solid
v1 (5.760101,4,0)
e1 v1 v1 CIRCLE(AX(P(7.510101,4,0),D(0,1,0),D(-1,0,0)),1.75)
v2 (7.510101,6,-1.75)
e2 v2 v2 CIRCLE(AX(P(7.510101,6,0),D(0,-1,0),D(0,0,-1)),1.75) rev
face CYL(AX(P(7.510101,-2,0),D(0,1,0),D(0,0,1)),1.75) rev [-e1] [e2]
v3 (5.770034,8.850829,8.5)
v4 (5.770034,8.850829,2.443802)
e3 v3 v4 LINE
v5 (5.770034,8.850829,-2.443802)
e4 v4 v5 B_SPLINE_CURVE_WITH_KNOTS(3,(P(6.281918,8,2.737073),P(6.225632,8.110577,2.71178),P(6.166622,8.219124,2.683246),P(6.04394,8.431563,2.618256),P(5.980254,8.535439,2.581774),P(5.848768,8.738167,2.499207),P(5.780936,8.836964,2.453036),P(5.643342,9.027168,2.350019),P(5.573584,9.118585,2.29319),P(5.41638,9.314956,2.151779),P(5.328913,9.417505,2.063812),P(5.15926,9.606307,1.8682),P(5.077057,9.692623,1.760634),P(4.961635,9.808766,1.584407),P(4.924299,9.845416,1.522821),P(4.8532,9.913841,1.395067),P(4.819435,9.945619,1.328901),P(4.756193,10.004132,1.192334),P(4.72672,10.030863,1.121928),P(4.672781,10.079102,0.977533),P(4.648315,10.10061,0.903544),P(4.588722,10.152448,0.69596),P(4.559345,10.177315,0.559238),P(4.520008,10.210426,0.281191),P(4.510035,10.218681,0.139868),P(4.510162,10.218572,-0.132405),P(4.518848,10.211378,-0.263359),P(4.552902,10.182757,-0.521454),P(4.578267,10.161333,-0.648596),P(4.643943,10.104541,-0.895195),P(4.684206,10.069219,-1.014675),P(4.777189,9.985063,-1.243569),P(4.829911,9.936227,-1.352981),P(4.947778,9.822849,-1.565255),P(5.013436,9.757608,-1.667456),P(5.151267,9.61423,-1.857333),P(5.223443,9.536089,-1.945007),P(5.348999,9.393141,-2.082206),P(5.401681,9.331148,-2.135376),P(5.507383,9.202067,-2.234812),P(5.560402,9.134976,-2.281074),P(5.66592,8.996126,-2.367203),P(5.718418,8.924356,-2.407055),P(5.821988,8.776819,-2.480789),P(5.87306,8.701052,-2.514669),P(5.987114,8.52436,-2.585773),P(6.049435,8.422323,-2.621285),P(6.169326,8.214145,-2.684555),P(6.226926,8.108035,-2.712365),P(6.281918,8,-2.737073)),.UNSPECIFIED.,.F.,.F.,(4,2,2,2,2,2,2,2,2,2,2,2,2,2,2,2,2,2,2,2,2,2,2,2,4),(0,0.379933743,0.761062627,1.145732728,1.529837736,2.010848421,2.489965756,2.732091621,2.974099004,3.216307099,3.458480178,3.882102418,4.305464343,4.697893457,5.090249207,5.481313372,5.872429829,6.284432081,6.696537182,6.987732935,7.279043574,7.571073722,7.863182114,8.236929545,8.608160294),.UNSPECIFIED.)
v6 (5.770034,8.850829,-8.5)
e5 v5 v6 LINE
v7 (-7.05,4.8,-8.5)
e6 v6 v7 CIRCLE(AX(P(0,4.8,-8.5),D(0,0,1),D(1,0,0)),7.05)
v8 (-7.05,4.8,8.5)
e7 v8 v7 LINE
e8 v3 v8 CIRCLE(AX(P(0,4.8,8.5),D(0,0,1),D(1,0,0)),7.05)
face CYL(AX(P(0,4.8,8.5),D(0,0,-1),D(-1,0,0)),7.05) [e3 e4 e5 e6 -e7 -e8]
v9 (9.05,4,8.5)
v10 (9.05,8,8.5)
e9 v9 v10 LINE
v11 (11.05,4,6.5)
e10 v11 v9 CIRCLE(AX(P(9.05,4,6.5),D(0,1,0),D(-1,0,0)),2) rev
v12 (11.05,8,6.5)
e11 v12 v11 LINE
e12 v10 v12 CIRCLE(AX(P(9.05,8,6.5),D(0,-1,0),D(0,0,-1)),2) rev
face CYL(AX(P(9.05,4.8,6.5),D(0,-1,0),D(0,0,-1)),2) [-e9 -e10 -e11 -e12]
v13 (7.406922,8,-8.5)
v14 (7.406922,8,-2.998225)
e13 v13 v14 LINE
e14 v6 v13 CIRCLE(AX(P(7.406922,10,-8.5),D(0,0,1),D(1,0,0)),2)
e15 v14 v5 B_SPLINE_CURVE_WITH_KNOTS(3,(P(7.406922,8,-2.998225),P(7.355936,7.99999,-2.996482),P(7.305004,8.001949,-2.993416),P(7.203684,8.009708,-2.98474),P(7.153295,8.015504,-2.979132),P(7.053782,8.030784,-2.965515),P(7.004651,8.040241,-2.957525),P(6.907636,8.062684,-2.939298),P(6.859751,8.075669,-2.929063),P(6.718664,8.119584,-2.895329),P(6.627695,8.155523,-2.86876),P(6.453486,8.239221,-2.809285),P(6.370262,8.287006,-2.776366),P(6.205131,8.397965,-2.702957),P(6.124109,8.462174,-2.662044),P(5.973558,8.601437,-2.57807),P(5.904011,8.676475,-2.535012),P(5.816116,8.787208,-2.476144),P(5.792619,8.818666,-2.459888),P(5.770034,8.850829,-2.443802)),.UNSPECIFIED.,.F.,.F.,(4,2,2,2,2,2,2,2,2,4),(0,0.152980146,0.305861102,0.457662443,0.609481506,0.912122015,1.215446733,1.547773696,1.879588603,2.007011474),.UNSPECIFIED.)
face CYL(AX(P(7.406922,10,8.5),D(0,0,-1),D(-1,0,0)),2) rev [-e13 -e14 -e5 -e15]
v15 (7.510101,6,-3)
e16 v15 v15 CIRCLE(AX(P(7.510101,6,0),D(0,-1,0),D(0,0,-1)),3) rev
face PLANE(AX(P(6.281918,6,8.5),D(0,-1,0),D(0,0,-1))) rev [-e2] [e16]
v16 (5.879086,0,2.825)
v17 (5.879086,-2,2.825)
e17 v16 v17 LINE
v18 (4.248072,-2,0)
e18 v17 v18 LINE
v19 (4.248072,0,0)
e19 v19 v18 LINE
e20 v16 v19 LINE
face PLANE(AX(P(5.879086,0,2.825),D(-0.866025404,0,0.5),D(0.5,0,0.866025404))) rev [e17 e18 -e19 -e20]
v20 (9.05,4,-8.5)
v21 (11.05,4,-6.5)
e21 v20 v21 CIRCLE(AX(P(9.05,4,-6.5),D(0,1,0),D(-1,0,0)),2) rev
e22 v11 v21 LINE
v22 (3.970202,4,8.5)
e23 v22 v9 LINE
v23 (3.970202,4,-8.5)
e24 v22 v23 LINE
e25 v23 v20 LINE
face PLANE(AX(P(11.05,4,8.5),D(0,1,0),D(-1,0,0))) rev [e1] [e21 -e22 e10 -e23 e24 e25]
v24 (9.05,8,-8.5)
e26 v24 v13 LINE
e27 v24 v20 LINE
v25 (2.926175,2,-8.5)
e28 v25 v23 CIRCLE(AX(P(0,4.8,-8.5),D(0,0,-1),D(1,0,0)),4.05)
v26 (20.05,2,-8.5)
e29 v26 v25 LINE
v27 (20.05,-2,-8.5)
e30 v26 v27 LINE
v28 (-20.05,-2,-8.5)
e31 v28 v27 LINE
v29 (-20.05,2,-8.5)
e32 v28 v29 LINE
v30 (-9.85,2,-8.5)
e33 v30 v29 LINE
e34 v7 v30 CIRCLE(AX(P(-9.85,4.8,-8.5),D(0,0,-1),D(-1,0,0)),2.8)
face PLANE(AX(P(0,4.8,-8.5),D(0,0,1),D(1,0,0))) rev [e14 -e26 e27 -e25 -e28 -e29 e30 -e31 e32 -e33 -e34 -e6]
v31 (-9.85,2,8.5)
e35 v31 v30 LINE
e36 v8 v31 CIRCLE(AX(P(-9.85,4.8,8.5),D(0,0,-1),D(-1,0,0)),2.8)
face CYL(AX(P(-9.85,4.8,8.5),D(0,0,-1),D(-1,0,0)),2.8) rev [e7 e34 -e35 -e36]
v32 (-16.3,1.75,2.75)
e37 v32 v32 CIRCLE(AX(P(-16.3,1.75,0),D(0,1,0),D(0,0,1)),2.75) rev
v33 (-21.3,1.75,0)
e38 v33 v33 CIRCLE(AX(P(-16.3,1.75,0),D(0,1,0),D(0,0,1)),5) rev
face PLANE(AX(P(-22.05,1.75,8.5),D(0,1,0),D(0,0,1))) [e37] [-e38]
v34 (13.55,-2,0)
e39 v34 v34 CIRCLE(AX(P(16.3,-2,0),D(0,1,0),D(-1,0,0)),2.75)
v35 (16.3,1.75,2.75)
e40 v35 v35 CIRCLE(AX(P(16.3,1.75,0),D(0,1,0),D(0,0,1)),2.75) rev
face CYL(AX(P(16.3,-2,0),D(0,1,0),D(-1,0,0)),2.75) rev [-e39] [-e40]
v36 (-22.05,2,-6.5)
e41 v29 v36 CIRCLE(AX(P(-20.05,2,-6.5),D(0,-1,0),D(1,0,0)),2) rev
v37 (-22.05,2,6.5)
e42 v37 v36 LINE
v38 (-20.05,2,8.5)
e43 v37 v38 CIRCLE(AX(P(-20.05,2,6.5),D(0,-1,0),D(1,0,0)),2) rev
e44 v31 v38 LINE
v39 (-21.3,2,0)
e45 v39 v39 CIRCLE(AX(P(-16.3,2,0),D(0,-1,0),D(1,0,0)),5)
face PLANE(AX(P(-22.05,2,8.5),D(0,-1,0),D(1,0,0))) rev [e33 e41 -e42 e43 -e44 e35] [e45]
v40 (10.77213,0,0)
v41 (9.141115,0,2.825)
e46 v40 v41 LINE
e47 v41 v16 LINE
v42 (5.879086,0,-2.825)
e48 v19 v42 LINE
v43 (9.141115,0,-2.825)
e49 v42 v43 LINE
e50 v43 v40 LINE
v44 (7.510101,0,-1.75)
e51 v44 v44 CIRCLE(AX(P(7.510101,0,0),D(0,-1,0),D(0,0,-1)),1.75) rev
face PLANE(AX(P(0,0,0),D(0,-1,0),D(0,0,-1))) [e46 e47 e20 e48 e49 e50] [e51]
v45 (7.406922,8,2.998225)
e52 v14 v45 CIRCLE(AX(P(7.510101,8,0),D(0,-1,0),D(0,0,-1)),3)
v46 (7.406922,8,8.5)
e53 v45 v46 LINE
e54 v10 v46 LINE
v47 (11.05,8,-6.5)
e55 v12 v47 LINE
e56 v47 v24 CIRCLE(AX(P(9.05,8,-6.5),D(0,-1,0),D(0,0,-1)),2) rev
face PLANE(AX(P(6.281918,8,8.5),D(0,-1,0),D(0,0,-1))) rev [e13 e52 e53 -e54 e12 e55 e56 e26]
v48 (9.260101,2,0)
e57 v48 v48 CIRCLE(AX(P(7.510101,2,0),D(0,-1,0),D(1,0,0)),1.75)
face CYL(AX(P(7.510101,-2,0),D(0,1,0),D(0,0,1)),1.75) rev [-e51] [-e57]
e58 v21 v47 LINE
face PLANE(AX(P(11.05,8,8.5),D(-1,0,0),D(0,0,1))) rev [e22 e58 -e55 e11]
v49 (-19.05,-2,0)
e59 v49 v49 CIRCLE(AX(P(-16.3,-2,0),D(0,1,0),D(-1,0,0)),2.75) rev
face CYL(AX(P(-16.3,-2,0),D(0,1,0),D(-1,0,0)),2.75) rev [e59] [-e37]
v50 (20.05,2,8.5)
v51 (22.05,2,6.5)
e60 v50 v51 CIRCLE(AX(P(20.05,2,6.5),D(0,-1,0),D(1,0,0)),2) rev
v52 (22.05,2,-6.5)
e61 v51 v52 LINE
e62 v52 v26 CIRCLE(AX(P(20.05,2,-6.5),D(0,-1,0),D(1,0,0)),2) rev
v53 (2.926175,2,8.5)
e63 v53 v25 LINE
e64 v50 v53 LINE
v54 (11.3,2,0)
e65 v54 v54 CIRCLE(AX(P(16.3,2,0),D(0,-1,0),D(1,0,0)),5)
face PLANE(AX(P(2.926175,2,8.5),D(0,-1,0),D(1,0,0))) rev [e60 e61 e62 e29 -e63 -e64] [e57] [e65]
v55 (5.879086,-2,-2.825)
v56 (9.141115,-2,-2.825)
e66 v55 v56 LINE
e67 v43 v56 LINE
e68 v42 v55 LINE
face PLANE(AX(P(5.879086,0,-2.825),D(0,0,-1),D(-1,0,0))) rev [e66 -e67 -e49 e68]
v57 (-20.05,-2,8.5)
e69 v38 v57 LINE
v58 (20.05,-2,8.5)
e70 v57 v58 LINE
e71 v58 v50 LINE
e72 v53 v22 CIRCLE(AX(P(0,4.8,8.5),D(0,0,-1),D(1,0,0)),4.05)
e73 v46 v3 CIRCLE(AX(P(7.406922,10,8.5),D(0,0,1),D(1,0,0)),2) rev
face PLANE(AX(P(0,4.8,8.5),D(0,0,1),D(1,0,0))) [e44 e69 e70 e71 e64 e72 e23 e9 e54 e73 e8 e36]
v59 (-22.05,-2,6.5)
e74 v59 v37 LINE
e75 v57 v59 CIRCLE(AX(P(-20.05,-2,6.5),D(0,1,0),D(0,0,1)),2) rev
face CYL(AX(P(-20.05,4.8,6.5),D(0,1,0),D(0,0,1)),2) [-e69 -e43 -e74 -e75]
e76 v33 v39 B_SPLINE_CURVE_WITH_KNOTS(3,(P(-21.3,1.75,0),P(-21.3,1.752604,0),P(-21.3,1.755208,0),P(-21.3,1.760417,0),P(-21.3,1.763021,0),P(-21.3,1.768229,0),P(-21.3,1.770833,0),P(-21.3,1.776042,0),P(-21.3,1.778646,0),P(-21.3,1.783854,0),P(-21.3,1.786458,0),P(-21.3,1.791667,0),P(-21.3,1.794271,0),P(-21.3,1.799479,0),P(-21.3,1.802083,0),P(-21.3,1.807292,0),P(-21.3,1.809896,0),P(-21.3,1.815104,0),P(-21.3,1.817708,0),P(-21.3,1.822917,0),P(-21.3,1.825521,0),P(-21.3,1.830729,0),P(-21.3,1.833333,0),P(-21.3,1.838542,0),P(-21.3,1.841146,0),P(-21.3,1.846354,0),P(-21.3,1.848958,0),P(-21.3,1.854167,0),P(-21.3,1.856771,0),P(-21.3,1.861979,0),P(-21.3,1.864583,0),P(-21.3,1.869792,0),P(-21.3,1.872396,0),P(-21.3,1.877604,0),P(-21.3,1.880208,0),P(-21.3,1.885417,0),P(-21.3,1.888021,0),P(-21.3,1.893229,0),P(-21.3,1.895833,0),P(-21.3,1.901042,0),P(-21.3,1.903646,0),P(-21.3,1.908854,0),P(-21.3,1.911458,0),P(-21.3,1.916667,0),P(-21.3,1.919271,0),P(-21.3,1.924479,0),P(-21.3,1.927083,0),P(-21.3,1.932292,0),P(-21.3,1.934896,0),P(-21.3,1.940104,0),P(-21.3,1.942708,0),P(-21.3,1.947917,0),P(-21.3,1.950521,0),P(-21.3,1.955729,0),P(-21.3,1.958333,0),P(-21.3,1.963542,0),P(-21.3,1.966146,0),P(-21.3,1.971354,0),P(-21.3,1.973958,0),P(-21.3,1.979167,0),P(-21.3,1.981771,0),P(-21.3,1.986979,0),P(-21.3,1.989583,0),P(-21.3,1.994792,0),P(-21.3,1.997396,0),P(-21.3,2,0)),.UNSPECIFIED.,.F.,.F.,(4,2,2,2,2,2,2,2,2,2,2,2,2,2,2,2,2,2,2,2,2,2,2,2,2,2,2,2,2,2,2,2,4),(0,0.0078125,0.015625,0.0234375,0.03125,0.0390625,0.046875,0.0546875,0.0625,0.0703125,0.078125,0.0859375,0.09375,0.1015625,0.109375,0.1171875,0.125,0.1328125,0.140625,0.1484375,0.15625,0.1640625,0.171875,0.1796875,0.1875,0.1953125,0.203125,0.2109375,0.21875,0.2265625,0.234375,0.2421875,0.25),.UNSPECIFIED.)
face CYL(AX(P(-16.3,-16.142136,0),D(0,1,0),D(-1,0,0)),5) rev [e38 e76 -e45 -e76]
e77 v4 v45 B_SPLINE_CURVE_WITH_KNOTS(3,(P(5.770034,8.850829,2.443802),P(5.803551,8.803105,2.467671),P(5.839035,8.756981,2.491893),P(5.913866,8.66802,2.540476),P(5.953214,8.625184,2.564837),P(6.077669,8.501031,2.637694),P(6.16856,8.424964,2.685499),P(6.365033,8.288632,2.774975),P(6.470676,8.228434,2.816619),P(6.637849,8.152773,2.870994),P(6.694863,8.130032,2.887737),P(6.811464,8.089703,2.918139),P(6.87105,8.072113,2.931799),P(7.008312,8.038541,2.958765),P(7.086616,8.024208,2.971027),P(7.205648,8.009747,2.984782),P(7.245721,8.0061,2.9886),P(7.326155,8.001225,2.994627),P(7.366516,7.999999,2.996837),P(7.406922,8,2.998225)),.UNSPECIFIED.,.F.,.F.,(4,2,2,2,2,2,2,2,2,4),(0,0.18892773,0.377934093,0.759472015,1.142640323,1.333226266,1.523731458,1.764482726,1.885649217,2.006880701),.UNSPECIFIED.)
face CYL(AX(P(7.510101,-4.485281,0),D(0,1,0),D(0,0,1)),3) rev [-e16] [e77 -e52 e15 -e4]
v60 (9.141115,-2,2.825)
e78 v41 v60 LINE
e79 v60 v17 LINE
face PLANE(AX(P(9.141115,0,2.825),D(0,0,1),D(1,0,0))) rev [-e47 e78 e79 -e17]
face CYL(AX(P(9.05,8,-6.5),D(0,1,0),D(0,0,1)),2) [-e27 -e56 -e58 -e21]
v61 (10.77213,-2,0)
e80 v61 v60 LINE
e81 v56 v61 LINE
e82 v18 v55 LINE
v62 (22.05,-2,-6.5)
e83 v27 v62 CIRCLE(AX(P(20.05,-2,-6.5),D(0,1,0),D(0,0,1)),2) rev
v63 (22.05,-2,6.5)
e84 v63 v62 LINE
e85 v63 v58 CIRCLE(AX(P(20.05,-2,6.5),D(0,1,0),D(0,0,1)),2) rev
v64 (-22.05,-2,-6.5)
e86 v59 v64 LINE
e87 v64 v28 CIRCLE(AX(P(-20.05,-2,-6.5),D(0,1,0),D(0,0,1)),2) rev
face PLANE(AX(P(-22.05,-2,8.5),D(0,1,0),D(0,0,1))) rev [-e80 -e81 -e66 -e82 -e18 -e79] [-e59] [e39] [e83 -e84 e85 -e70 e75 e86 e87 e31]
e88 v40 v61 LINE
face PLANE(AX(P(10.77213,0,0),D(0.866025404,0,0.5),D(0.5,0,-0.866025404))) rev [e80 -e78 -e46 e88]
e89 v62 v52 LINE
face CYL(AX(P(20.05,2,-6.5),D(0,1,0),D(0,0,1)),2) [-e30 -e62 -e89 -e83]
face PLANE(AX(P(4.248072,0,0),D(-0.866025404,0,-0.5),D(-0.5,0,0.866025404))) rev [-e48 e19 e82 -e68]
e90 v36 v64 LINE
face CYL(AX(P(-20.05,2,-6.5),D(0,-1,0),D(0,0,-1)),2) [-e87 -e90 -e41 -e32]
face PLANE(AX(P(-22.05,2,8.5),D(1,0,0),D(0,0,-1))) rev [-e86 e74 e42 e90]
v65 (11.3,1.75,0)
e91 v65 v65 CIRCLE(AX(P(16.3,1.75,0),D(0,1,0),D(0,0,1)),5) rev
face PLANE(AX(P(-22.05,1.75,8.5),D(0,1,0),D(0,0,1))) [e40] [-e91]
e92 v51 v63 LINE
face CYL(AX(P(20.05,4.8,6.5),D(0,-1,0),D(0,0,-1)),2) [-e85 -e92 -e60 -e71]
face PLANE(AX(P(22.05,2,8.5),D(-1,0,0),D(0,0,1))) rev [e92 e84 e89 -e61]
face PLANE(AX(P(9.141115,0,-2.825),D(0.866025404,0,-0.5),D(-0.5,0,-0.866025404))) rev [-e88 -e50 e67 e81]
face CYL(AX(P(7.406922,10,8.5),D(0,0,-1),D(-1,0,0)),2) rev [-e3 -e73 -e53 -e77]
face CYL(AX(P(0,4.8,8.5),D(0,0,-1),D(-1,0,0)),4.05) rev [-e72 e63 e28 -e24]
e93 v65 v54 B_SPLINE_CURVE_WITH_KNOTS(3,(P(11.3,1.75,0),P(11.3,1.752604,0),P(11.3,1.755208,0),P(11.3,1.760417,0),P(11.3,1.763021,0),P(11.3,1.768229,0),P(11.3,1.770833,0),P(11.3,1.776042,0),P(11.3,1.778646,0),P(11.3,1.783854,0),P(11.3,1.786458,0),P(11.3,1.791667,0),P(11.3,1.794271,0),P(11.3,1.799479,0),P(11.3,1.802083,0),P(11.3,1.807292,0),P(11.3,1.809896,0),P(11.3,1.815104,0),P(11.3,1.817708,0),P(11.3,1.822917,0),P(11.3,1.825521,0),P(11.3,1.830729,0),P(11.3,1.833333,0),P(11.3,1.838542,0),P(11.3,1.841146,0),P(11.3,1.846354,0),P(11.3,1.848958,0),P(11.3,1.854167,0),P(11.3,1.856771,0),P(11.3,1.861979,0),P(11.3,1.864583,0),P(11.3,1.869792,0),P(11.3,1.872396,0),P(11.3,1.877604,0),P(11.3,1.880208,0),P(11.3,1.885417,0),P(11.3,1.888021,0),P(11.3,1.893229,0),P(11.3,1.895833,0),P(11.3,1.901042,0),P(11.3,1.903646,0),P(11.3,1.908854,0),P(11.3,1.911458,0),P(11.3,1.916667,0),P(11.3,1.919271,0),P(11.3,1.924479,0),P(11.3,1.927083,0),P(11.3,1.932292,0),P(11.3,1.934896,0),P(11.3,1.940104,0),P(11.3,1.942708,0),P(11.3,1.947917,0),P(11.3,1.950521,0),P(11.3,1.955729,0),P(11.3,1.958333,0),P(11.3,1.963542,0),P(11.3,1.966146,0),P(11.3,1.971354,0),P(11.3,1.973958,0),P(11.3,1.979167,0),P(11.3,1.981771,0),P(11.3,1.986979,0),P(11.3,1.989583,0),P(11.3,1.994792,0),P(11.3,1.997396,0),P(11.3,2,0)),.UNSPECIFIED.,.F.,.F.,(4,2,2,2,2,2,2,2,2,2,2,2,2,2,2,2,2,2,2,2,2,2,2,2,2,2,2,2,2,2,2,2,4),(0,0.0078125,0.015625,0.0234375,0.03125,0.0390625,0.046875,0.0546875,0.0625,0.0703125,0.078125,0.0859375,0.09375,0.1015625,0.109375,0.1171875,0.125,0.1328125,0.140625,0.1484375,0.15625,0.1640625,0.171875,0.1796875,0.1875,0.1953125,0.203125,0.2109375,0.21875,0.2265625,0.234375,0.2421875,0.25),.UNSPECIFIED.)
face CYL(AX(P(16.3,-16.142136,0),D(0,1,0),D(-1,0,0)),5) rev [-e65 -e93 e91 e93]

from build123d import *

# Parameters (mm, degrees)
BOSS_EXTRUDE1_DEPTH     = 8.5
CUT_EXTRUDE1_DEPTH      = 2
CUT_EXTRUDE1_DEPTH_BACK = 26.602245995
SKETCH2_R               = 2.75
CUT_EXTRUDE2_DEPTH      = 2
CUT_EXTRUDE2_DEPTH_BACK = 0.25
SKETCH2_3_R             = 5
SKETCH2_3_R_2           = 2.75
SKETCH3_R               = 1.75
CUT_EXTRUDE3_DEPTH      = 28.391148205
SKETCH3_3_R             = 3
SKETCH3_3_R_2           = 1.75
CUT_EXTRUDE4_DEPTH      = 5.85
FILLET1_R               = 2
FILLET2_R               = 2
CUT_EXTRUDE5_DEPTH      = 2


with BuildPart() as part:
    # Sketch1 → Boss-Extrude1 (new, symmetric)
    with BuildSketch(Plane.XY):
        with BuildLine():
            Line((11.05, 4), (3.970201506, 4))
            ThreePointArc((3.970201506, 4), (-3.590264914, 6.674165907), (2.926174978, 2))
            Line((2.926174978, 2), (22.05, 2))
            Line((22.05, 2), (22.05, -2))
            Line((22.05, -2), (-22.05, -2))
            Line((-22.05, -2), (-22.05, 2))
            Line((-22.05, 2), (-9.85, 2))
            ThreePointArc((-9.85, 2), (-7.870101013, 2.820101013), (-7.05, 4.8))
            ThreePointArc((-7.05, 4.8), (-1.645444408, 11.655290855), (6.281918497, 8))
            Line((6.281918497, 8), (11.05, 8))
            Line((11.05, 8), (11.05, 4))
        make_face()
    extrude(amount=BOSS_EXTRUDE1_DEPTH, both=True)

    # Sketch2 → Cut-Extrude1 (cut, two sides: drawn at the far end of the back side and taken through both)
    with BuildSketch(Plane(origin=(0, 2, 0), x_dir=(1, 0, 0), z_dir=(0, 1, 0)).offset(-CUT_EXTRUDE1_DEPTH_BACK)):
        with Locations(Location((16.3, 0, 0), (0, 0, 180))):
            Circle(SKETCH2_R)
        with Locations(Location((-16.3, 0, 0), (0, 0, 180))):
            Circle(SKETCH2_R)
    extrude(amount=CUT_EXTRUDE1_DEPTH + CUT_EXTRUDE1_DEPTH_BACK, mode=Mode.SUBTRACT)

    # Sketch2<3> → Cut-Extrude2 (cut, two sides: drawn at the far end of the back side and taken through both)
    # profile 1 of 2: a face of its own
    with BuildSketch(Plane(origin=(0, 2, 0), x_dir=(1, 0, 0), z_dir=(0, 1, 0)).offset(-CUT_EXTRUDE2_DEPTH_BACK)):
        with Locations(Location((16.3, 0, 0), (0, 0, 180))):
            Circle(SKETCH2_3_R)
        with Locations(Location((16.3, 0, 0), (0, 0, 180))):
            Circle(SKETCH2_3_R_2, mode=Mode.SUBTRACT)
    # profile 2 of 2: a face of its own
    with BuildSketch(Plane(origin=(0, 2, 0), x_dir=(1, 0, 0), z_dir=(0, 1, 0)).offset(-CUT_EXTRUDE2_DEPTH_BACK)):
        with Locations(Location((-16.3, 0, 0), (0, 0, 180))):
            Circle(SKETCH2_3_R)
        with Locations(Location((-16.3, 0, 0), (0, 0, 180))):
            Circle(SKETCH2_3_R_2, mode=Mode.SUBTRACT)
    extrude(amount=CUT_EXTRUDE2_DEPTH + CUT_EXTRUDE2_DEPTH_BACK, mode=Mode.SUBTRACT)

    # Sketch3 → Cut-Extrude3 (cut, through all)
    with BuildSketch(Plane(origin=(0, 11.85, 0), x_dir=(1, 0, 0), z_dir=(0, 1, 0))):
        with Locations(Location((7.510100753, 0, 0), (0, 0, 225.426920251))):
            Circle(SKETCH3_R)
    extrude(amount=-CUT_EXTRUDE3_DEPTH, mode=Mode.SUBTRACT)

    # Sketch3<3> → Cut-Extrude4 (cut)
    # profile 1 of 2: a face of its own
    with BuildSketch(Plane(origin=(0, 11.85, 0), x_dir=(1, 0, 0), z_dir=(0, 1, 0))):
        with Locations(Location((7.510100753, 0, 0), (0, 0, 245.83322212))):
            Circle(SKETCH3_3_R)
        with Locations(Location((7.510100753, 0, 0), (0, 0, 180))):
            Circle(SKETCH3_3_R_2, mode=Mode.SUBTRACT)
    # profile 2 of 2: a face of its own
    with BuildSketch(Plane(origin=(0, 11.85, 0), x_dir=(1, 0, 0), z_dir=(0, 1, 0))):
        with Locations(Location((7.510100753, 0, 0), (0, 0, 180))):
            Circle(SKETCH3_3_R_2)
    extrude(amount=-CUT_EXTRUDE4_DEPTH, mode=Mode.SUBTRACT)

    # Fillet1
    fillet1_edges = [part.edges().sort_by_distance(p)[0] for p in [
        (22.05, 0, 8.5),
        (22.05, 0, -8.5),
        (-22.05, 0, -8.5),
        (-22.05, 0, 8.5),
    ]]
    fillet(fillet1_edges, radius=FILLET1_R)

    # Fillet2
    # the kernel refuses this fillet: 2 mm, written as the material it adds along each edge
    with BuildSketch(Plane(origin=(6.281918497, 8, -0.075436901), x_dir=(1, 0, 0), z_dir=(0, 0, 1))) as fillet2_piece_1_section:
        with BuildLine():
            CenterArc((1.125003941, 2), FILLET2_R, 215.07061915, 54.92938085)
            ThreePointArc((-0.511884995, 0.850828729), (-0.240944724, 0.434437491), (0, 0))
            Line((0, 0), (1.125003941, 0))
        make_face()
    fillet2_piece_1 = extrude(amount=8.575436901, mode=Mode.PRIVATE)
    fillet2_piece_1 = fillet2_piece_1 - Plane(origin=(7.510100753, 8.184515376, 0), x_dir=(-0.4093940854484991, 0, 0.9123576507049125), z_dir=(0, 1, 0)) * Cylinder(3, 22, mode=Mode.PRIVATE)
    add(fillet2_piece_1)
    with BuildSketch(Plane(origin=(6.281918497, 8, -8.5), x_dir=(1, 0, 0), z_dir=(0, 0, 1))) as fillet2_piece_2_section:
        with BuildLine():
            CenterArc((1.125003941, 2), FILLET2_R, 215.07061915, 54.92938085)
            ThreePointArc((-0.511884995, 0.850828729), (-0.240944724, 0.434437491), (0, 0))
            Line((0, 0), (1.125003941, 0))
        make_face()
    fillet2_piece_2 = extrude(amount=8.575436901, mode=Mode.PRIVATE)
    fillet2_piece_2 = fillet2_piece_2 - Plane(origin=(7.510100753, 8.184515325, 0), x_dir=(-0.4093940854484991, 0, 0.9123576507049125), z_dir=(0, 1, 0)) * Cylinder(3, 22, mode=Mode.PRIVATE)
    add(fillet2_piece_2)
    # the kernel refuses this fillet: 2 mm, written as the material it takes off along each edge
    with BuildSketch(Plane(origin=(11.05, 13, -8.5), x_dir=(-1, 0, 0), z_dir=(0, -1, 0))) as fillet2_2_piece_1_section:
        with BuildLine():
            CenterArc((FILLET2_R, -FILLET2_R), FILLET2_R, 90, 90)
            Line((0, -FILLET2_R), (0, 0))
            Line((0, 0), (FILLET2_R, 0))
        make_face()
    fillet2_2_piece_1 = extrude(amount=14, mode=Mode.PRIVATE)
    fillet2_2_piece_1 = split(fillet2_2_piece_1, bisect_by=Plane(origin=(10.603264122, 2, -8.053264122), z_dir=(0, 1, 0)), keep=Keep.TOP, mode=Mode.PRIVATE)
    add(fillet2_2_piece_1, mode=Mode.SUBTRACT)
    with BuildSketch(Plane(origin=(11.05, 13, 8.5), x_dir=(-1, 0, 0), z_dir=(0, -1, 0))) as fillet2_2_piece_2_section:
        with BuildLine():
            CenterArc((FILLET2_R, FILLET2_R), FILLET2_R, 180, 90)
            Line((0, FILLET2_R), (0, 0))
            Line((0, 0), (FILLET2_R, 0))
        make_face()
    fillet2_2_piece_2 = extrude(amount=14, mode=Mode.PRIVATE)
    fillet2_2_piece_2 = split(fillet2_2_piece_2, bisect_by=Plane(origin=(10.603264122, 2, 8.053264122), z_dir=(0, 1, 0)), keep=Keep.TOP, mode=Mode.PRIVATE)
    add(fillet2_2_piece_2, mode=Mode.SUBTRACT)

    # Sketch4 → Cut-Extrude5 (cut)
    with BuildSketch(Plane.XZ.offset(2)):
        Polygon((10.772129774, 0), (9.141115264, 2.825), (5.879086243, 2.825), (4.248071732, 0), (5.879086243, -2.825), (9.141115264, -2.825), align=None)
    extrude(amount=-CUT_EXTRUDE5_DEPTH, mode=Mode.SUBTRACT)


solid = part.part
